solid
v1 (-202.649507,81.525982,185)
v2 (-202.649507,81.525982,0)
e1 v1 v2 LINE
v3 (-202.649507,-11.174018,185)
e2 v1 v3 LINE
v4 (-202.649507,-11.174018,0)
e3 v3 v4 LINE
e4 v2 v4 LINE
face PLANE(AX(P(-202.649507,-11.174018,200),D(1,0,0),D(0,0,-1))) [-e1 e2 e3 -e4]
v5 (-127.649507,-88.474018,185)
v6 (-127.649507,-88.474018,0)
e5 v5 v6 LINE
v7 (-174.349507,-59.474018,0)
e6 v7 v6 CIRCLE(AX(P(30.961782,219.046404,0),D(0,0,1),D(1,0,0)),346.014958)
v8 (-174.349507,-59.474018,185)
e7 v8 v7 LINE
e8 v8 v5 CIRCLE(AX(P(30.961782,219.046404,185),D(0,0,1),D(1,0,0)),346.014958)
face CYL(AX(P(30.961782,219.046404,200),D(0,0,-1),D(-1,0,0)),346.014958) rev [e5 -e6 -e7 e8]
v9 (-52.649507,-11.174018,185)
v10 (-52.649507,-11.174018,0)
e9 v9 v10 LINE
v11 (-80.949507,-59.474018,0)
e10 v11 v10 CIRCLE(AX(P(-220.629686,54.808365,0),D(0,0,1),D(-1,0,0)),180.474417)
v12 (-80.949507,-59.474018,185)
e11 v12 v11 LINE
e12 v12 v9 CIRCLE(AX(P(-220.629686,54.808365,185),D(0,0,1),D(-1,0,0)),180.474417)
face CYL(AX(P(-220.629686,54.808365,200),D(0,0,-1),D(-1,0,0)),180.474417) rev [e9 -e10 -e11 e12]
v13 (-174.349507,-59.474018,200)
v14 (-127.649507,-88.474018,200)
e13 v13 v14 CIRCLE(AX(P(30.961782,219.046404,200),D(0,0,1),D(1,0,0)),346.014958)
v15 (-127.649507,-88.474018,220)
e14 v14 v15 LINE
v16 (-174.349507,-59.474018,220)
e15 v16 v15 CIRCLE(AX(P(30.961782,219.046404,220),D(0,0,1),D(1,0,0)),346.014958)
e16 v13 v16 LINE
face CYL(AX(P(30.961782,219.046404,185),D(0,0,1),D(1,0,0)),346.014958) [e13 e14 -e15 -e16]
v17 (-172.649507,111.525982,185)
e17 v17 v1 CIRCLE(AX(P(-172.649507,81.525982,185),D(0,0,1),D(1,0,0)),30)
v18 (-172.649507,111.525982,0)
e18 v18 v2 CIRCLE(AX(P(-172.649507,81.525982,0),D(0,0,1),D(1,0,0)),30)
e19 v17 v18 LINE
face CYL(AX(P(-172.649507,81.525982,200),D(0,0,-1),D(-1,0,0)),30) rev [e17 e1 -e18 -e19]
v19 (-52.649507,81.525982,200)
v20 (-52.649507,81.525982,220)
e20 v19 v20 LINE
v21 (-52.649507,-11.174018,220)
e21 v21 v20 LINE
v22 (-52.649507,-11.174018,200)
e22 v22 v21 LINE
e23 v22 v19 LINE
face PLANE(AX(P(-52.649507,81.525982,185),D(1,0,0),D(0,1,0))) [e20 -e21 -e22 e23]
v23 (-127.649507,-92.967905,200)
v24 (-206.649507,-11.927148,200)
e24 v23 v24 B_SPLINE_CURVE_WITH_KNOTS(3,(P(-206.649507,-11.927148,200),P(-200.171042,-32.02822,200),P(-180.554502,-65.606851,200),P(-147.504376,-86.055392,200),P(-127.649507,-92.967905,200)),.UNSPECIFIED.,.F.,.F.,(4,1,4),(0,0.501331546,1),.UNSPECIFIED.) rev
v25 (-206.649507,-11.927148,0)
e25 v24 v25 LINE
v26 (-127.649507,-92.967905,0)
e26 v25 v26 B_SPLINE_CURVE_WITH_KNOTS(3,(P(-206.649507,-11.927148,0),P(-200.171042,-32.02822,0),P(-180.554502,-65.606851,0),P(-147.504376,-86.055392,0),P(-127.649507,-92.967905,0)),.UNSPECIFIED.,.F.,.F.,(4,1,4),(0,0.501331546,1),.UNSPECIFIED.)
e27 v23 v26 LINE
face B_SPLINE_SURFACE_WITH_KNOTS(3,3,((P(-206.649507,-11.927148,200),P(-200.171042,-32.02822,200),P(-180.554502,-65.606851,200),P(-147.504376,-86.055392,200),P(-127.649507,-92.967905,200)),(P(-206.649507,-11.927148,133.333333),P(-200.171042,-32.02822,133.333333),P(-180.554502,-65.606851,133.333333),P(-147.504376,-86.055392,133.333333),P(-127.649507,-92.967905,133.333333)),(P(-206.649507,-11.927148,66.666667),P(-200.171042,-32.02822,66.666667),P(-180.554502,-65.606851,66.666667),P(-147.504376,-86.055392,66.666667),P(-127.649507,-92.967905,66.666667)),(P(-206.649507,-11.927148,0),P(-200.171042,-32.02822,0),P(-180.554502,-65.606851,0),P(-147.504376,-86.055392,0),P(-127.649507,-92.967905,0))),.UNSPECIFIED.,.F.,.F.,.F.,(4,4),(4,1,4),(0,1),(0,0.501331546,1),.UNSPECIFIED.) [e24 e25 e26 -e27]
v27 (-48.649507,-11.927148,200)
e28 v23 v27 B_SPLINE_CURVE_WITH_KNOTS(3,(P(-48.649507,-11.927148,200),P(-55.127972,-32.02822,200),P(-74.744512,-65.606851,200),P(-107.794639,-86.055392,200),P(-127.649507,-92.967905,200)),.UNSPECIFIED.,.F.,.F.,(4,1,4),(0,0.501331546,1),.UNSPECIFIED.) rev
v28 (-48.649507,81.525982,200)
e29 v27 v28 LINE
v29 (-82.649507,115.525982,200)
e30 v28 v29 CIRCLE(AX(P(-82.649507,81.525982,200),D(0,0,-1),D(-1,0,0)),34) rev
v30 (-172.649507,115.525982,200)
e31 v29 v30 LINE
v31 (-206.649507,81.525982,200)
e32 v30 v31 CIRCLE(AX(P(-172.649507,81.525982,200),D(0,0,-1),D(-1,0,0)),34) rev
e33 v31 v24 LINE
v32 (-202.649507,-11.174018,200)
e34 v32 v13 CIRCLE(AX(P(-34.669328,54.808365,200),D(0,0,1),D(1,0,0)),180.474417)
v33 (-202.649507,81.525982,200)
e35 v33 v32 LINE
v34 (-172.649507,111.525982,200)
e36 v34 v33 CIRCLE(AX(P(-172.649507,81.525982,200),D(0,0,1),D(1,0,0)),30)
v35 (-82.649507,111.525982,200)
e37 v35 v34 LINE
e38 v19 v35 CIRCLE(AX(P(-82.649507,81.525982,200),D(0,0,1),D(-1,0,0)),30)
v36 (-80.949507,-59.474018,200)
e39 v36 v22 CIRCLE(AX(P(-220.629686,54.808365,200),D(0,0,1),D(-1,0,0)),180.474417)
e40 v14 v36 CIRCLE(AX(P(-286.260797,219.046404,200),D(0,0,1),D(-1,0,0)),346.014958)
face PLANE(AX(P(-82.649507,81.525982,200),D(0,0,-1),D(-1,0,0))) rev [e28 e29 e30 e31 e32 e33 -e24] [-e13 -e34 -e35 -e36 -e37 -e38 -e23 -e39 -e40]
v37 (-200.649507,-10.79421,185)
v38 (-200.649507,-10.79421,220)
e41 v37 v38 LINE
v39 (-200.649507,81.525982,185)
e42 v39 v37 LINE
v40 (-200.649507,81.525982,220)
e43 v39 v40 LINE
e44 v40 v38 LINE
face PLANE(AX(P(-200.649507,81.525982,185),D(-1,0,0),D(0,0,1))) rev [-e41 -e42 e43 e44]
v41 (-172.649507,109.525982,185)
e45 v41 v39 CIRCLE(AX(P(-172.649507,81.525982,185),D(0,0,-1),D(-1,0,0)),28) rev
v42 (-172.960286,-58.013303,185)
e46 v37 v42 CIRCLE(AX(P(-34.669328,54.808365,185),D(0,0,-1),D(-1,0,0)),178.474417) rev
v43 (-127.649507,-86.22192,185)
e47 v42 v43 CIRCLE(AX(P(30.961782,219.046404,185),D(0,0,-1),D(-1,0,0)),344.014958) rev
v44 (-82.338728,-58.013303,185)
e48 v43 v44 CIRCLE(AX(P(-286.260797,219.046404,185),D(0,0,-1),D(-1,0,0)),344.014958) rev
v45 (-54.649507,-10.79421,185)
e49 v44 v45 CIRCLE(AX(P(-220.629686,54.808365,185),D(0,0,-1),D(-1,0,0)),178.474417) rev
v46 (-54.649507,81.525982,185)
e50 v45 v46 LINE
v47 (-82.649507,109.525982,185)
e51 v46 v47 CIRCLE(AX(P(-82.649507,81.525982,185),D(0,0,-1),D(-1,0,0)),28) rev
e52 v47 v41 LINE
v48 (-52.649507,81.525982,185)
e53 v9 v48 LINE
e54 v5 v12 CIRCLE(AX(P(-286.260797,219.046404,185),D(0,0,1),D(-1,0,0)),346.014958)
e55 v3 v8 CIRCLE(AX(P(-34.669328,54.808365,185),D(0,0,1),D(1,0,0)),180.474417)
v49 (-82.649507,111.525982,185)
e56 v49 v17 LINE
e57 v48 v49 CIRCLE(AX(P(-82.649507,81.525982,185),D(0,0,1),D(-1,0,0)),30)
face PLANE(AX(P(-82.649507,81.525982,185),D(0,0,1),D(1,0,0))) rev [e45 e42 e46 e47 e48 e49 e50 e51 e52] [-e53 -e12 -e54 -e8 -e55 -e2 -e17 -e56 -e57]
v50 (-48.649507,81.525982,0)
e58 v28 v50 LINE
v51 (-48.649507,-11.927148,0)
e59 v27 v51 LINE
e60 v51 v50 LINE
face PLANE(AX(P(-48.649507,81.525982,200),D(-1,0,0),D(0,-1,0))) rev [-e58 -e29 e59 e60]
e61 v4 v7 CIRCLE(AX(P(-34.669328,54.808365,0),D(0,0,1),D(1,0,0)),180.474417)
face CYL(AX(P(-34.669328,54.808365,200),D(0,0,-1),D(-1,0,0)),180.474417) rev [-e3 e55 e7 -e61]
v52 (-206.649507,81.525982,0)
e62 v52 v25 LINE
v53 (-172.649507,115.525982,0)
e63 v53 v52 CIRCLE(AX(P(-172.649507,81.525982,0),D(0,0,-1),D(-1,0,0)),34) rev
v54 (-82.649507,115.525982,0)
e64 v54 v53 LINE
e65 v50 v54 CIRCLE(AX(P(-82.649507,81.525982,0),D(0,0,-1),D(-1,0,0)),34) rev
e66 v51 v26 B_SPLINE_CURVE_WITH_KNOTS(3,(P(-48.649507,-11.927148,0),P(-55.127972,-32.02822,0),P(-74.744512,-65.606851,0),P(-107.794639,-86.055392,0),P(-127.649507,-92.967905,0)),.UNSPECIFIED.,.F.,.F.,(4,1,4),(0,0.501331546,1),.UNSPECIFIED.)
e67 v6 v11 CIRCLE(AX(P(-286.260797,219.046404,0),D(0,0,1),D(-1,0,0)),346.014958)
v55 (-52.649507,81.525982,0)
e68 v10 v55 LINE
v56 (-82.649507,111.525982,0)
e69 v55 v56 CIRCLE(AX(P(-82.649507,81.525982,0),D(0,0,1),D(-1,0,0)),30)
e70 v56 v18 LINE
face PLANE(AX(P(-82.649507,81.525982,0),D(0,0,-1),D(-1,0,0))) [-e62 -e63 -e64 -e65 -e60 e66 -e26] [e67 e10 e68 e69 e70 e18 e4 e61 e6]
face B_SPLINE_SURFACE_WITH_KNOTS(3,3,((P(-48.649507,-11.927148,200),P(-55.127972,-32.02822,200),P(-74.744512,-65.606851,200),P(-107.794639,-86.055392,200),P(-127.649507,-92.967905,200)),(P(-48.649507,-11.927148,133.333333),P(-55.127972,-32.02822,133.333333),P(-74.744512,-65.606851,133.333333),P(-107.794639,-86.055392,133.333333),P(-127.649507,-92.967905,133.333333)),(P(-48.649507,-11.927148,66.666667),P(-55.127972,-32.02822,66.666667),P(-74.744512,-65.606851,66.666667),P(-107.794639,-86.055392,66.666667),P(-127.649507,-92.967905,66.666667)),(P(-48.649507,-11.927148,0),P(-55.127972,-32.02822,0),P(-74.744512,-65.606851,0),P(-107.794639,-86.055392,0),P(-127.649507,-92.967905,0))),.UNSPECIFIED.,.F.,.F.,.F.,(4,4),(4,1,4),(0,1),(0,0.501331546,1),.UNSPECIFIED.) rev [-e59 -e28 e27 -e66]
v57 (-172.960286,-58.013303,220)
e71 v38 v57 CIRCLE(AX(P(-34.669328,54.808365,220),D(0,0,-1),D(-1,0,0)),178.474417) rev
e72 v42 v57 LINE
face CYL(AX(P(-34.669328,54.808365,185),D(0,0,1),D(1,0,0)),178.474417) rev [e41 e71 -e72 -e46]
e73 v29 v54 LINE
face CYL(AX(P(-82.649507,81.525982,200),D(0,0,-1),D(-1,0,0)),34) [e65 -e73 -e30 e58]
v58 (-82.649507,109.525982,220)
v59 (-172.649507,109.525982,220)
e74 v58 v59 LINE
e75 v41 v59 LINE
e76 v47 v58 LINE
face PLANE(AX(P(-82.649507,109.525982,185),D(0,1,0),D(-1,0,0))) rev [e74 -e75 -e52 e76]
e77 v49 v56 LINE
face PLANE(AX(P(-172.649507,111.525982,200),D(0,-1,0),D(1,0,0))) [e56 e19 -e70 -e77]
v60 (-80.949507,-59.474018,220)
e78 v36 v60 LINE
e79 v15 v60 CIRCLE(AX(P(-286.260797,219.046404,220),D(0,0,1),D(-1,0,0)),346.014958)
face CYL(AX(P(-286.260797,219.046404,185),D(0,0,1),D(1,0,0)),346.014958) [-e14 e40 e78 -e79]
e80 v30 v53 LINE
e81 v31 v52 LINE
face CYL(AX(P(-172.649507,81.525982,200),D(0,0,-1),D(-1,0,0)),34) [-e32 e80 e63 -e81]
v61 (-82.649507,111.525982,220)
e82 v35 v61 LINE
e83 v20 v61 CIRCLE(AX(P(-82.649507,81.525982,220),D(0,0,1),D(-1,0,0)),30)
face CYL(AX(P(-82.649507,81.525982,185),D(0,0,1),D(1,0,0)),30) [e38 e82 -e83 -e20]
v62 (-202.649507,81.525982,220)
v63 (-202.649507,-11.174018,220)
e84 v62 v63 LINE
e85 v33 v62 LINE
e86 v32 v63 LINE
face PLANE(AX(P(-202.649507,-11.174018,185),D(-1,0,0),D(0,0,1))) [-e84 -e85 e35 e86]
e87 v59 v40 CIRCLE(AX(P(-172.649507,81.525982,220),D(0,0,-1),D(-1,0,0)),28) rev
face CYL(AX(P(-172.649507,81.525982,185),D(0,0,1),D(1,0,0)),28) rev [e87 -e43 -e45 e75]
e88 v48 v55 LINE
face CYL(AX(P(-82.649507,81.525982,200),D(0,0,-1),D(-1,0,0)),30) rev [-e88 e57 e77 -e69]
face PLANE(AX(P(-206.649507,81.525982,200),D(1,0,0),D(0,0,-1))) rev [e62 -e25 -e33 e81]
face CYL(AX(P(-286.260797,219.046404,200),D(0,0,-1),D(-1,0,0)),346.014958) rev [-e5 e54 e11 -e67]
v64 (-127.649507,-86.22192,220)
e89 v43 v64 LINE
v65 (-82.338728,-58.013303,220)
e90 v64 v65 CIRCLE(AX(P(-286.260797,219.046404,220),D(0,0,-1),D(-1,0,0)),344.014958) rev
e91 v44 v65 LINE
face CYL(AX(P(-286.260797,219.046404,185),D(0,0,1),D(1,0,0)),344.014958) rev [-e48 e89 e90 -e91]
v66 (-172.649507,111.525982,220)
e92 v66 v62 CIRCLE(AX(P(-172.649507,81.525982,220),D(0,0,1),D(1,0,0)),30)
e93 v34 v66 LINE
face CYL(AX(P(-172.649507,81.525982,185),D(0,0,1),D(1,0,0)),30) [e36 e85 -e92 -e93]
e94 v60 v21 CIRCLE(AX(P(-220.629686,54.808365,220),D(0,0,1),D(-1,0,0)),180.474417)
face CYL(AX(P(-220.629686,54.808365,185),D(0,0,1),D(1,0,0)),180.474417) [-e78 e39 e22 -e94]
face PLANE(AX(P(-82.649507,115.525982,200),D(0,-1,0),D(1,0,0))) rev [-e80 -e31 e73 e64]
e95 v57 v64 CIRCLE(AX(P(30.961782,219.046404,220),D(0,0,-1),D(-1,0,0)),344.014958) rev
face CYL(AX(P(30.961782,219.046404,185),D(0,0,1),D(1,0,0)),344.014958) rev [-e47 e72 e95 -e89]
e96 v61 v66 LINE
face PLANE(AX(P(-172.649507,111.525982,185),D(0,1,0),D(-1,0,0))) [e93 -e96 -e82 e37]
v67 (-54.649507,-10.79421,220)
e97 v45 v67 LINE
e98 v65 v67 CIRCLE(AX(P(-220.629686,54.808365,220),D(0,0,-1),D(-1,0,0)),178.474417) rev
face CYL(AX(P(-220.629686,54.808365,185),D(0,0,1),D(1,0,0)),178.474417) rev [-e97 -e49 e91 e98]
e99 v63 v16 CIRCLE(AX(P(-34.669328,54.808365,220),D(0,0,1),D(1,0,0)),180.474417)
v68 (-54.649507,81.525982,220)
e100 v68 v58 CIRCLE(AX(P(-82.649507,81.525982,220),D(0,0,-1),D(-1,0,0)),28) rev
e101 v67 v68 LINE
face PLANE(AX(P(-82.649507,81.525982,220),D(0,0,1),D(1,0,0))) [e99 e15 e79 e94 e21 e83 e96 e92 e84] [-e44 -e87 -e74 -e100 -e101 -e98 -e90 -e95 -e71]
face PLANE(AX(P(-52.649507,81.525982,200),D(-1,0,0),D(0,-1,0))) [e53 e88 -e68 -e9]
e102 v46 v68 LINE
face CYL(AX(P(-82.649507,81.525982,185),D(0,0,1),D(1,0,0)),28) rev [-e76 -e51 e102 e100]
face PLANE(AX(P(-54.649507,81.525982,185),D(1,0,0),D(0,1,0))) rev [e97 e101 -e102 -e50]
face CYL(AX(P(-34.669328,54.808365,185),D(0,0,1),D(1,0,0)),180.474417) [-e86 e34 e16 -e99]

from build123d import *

# Parameters (mm, degrees)
EXTRU_MINCE2_DEPTH      = 200
EPAISSIR5_DEPTH         = 200
EPAISSIR7_DEPTH         = 200
EXTRU_MINCE3_DEPTH      = 20
EXTRU_MINCE3_DEPTH_BACK = 15


# Read off the part's stored shape, not the designer's step: Epaissir5, Epaissir7
with BuildPart() as part:
    # Esquisse3 → Extru.-Mince2 (new body)
    with BuildSketch(Plane.XY):
        with BuildLine():
            Line((-206.649507199, -11.92714811), (-206.649507199, -3.47401752))
            Line((-206.649507199, -3.47401752), (-206.649507199, 81.52598248))
            ThreePointArc((-206.649507199, 81.52598248), (-196.691137759, 105.56761304), (-172.649507199, 115.52598248))
            Line((-172.649507199, 115.52598248), (-82.649507199, 115.52598248))
            ThreePointArc((-82.649507199, 115.52598248), (-58.607876638, 105.56761304), (-48.649507199, 81.52598248))
            Line((-48.649507199, 81.52598248), (-48.649507199, -11.92714811))
            ThreePointArc((-48.649507199, -11.92714811), (-61.399009455, -38.338842544), (-78.173060849, -62.396244951))
            ThreePointArc((-78.173060849, -62.396244951), (-102.275198337, -78.711501116), (-127.649507199, -92.967905467))
            ThreePointArc((-127.649507199, -92.967905467), (-153.023816061, -78.711501116), (-177.125953549, -62.396244951))
            ThreePointArc((-177.125953549, -62.396244951), (-193.900004942, -38.338842544), (-206.649507199, -11.92714811))
        make_face()
        with BuildLine():
            Line((-202.649507199, -11.17401752), (-202.649507199, -3.47401752))
            Line((-202.649507199, -3.47401752), (-202.649507199, 81.52598248))
            ThreePointArc((-202.649507199, 81.52598248), (-193.862710634, 102.739185916), (-172.649507199, 111.52598248))
            Line((-172.649507199, 111.52598248), (-82.649507199, 111.52598248))
            ThreePointArc((-82.649507199, 111.52598248), (-61.436303763, 102.739185916), (-52.649507199, 81.52598248))
            Line((-52.649507199, 81.52598248), (-52.649507199, -11.17401752))
            ThreePointArc((-52.649507199, -11.17401752), (-64.915375774, -36.427970301), (-80.949507199, -59.47401752))
            ThreePointArc((-80.949507199, -59.47401752), (-103.722688687, -74.902894226), (-127.649507199, -88.47401752))
            ThreePointArc((-127.649507199, -88.47401752), (-151.57632571, -74.902894226), (-174.349507199, -59.47401752))
            ThreePointArc((-174.349507199, -59.47401752), (-190.383638623, -36.427970301), (-202.649507199, -11.17401752))
        make_face(mode=Mode.SUBTRACT)
    extrude(amount=EXTRU_MINCE2_DEPTH)

    # Epaissir5 outline → Epaissir5 (add)
    with BuildSketch(Plane.XY):
        with BuildLine():
            add(Edge.make_bspline(
                [(-78.173060849, -62.396244951), (-91.313583381, -75.858349648), (-107.794638855, -86.055391974), (-127.649507199, -92.967905467)],
                knots=[0.501331546, 0.501331546, 0.501331546, 0.501331546, 1, 1, 1, 1], degree=3))
            ThreePointArc((-78.173060849, -62.396244951), (-102.275198337, -78.711501116), (-127.649507199, -92.967905467))
        make_face()
        with BuildLine():
            add(Edge.make_bspline(
                [(-48.649507199, -11.92714811), (-55.127972189, -32.028220402), (-64.962362616, -48.862247174), (-78.173060849, -62.396244951)],
                knots=[0, 0, 0, 0, 0.501331546, 0.501331546, 0.501331546, 0.501331546], degree=3))
            ThreePointArc((-48.649507199, -11.92714811), (-61.399009455, -38.338842545), (-78.173060849, -62.396244951))
        make_face()
    extrude(amount=EPAISSIR5_DEPTH)

    # Epaissir7 outline → Epaissir7 (add)
    with BuildSketch(Plane.XY):
        with BuildLine():
            ThreePointArc((-177.125953549, -62.396244951), (-193.900004942, -38.338842544), (-206.649507199, -11.92714811))
            add(Edge.make_bspline(
                [(-206.649507199, -11.92714811), (-200.171042209, -32.028220402), (-190.336651781, -48.862247174), (-177.125953549, -62.396244951)],
                knots=[0, 0, 0, 0, 0.501331546, 0.501331546, 0.501331546, 0.501331546], degree=3))
        make_face()
        with BuildLine():
            ThreePointArc((-127.649507199, -92.967905467), (-153.023816061, -78.711501116), (-177.125953549, -62.396244951))
            add(Edge.make_bspline(
                [(-177.125953549, -62.396244951), (-163.985431016, -75.858349648), (-147.504375542, -86.055391974), (-127.649507199, -92.967905467)],
                knots=[0.501331546, 0.501331546, 0.501331546, 0.501331546, 1, 1, 1, 1], degree=3))
        make_face()
    extrude(amount=EPAISSIR7_DEPTH)

    # Esquisse7 → Extru.-Mince3 (add, two sides: drawn at the far end of the back side and taken through both)
    with BuildSketch(Plane.XY.offset(200).offset(-EXTRU_MINCE3_DEPTH_BACK)):
        with BuildLine():
            Line((-202.649507199, -11.17401752), (-202.649507199, -3.47401752))
            Line((-202.649507199, -3.47401752), (-202.649507199, 81.52598248))
            ThreePointArc((-202.649507199, 81.52598248), (-193.862710634, 102.739185916), (-172.649507199, 111.52598248))
            Line((-172.649507199, 111.52598248), (-82.649507199, 111.52598248))
            ThreePointArc((-82.649507199, 111.52598248), (-61.436303763, 102.739185916), (-52.649507199, 81.52598248))
            Line((-52.649507199, 81.52598248), (-52.649507199, -11.17401752))
            ThreePointArc((-52.649507199, -11.17401752), (-64.915375774, -36.427970301), (-80.949507199, -59.47401752))
            ThreePointArc((-80.949507199, -59.47401752), (-103.722688687, -74.902894226), (-127.649507199, -88.47401752))
            ThreePointArc((-127.649507199, -88.47401752), (-151.57632571, -74.902894226), (-174.349507199, -59.47401752))
            ThreePointArc((-174.349507199, -59.47401752), (-190.383638623, -36.427970301), (-202.649507199, -11.17401752))
        make_face()
        with BuildLine():
            Line((-200.649507199, -10.794210022), (-200.649507199, -3.47401752))
            Line((-200.649507199, -3.47401752), (-200.649507199, 81.52598248))
            ThreePointArc((-200.649507199, 81.52598248), (-192.448497072, 101.324972353), (-172.649507199, 109.52598248))
            Line((-172.649507199, 109.52598248), (-82.649507199, 109.52598248))
            ThreePointArc((-82.649507199, 109.52598248), (-62.850517326, 101.324972353), (-54.649507199, 81.52598248))
            Line((-54.649507199, 81.52598248), (-54.649507199, -10.794210022))
            ThreePointArc((-54.649507199, -10.794210022), (-66.673062941, -35.471620796), (-82.338728425, -58.013302636))
            ThreePointArc((-82.338728425, -58.013302636), (-104.44621972, -72.997686116), (-127.649507199, -86.221920301))
            ThreePointArc((-127.649507199, -86.221920301), (-150.852794678, -72.997686116), (-172.960285972, -58.013302636))
            ThreePointArc((-172.960285972, -58.013302636), (-188.625951457, -35.471620796), (-200.649507199, -10.794210022))
        make_face(mode=Mode.SUBTRACT)
    extrude(amount=EXTRU_MINCE3_DEPTH + EXTRU_MINCE3_DEPTH_BACK)


solid = part.part
